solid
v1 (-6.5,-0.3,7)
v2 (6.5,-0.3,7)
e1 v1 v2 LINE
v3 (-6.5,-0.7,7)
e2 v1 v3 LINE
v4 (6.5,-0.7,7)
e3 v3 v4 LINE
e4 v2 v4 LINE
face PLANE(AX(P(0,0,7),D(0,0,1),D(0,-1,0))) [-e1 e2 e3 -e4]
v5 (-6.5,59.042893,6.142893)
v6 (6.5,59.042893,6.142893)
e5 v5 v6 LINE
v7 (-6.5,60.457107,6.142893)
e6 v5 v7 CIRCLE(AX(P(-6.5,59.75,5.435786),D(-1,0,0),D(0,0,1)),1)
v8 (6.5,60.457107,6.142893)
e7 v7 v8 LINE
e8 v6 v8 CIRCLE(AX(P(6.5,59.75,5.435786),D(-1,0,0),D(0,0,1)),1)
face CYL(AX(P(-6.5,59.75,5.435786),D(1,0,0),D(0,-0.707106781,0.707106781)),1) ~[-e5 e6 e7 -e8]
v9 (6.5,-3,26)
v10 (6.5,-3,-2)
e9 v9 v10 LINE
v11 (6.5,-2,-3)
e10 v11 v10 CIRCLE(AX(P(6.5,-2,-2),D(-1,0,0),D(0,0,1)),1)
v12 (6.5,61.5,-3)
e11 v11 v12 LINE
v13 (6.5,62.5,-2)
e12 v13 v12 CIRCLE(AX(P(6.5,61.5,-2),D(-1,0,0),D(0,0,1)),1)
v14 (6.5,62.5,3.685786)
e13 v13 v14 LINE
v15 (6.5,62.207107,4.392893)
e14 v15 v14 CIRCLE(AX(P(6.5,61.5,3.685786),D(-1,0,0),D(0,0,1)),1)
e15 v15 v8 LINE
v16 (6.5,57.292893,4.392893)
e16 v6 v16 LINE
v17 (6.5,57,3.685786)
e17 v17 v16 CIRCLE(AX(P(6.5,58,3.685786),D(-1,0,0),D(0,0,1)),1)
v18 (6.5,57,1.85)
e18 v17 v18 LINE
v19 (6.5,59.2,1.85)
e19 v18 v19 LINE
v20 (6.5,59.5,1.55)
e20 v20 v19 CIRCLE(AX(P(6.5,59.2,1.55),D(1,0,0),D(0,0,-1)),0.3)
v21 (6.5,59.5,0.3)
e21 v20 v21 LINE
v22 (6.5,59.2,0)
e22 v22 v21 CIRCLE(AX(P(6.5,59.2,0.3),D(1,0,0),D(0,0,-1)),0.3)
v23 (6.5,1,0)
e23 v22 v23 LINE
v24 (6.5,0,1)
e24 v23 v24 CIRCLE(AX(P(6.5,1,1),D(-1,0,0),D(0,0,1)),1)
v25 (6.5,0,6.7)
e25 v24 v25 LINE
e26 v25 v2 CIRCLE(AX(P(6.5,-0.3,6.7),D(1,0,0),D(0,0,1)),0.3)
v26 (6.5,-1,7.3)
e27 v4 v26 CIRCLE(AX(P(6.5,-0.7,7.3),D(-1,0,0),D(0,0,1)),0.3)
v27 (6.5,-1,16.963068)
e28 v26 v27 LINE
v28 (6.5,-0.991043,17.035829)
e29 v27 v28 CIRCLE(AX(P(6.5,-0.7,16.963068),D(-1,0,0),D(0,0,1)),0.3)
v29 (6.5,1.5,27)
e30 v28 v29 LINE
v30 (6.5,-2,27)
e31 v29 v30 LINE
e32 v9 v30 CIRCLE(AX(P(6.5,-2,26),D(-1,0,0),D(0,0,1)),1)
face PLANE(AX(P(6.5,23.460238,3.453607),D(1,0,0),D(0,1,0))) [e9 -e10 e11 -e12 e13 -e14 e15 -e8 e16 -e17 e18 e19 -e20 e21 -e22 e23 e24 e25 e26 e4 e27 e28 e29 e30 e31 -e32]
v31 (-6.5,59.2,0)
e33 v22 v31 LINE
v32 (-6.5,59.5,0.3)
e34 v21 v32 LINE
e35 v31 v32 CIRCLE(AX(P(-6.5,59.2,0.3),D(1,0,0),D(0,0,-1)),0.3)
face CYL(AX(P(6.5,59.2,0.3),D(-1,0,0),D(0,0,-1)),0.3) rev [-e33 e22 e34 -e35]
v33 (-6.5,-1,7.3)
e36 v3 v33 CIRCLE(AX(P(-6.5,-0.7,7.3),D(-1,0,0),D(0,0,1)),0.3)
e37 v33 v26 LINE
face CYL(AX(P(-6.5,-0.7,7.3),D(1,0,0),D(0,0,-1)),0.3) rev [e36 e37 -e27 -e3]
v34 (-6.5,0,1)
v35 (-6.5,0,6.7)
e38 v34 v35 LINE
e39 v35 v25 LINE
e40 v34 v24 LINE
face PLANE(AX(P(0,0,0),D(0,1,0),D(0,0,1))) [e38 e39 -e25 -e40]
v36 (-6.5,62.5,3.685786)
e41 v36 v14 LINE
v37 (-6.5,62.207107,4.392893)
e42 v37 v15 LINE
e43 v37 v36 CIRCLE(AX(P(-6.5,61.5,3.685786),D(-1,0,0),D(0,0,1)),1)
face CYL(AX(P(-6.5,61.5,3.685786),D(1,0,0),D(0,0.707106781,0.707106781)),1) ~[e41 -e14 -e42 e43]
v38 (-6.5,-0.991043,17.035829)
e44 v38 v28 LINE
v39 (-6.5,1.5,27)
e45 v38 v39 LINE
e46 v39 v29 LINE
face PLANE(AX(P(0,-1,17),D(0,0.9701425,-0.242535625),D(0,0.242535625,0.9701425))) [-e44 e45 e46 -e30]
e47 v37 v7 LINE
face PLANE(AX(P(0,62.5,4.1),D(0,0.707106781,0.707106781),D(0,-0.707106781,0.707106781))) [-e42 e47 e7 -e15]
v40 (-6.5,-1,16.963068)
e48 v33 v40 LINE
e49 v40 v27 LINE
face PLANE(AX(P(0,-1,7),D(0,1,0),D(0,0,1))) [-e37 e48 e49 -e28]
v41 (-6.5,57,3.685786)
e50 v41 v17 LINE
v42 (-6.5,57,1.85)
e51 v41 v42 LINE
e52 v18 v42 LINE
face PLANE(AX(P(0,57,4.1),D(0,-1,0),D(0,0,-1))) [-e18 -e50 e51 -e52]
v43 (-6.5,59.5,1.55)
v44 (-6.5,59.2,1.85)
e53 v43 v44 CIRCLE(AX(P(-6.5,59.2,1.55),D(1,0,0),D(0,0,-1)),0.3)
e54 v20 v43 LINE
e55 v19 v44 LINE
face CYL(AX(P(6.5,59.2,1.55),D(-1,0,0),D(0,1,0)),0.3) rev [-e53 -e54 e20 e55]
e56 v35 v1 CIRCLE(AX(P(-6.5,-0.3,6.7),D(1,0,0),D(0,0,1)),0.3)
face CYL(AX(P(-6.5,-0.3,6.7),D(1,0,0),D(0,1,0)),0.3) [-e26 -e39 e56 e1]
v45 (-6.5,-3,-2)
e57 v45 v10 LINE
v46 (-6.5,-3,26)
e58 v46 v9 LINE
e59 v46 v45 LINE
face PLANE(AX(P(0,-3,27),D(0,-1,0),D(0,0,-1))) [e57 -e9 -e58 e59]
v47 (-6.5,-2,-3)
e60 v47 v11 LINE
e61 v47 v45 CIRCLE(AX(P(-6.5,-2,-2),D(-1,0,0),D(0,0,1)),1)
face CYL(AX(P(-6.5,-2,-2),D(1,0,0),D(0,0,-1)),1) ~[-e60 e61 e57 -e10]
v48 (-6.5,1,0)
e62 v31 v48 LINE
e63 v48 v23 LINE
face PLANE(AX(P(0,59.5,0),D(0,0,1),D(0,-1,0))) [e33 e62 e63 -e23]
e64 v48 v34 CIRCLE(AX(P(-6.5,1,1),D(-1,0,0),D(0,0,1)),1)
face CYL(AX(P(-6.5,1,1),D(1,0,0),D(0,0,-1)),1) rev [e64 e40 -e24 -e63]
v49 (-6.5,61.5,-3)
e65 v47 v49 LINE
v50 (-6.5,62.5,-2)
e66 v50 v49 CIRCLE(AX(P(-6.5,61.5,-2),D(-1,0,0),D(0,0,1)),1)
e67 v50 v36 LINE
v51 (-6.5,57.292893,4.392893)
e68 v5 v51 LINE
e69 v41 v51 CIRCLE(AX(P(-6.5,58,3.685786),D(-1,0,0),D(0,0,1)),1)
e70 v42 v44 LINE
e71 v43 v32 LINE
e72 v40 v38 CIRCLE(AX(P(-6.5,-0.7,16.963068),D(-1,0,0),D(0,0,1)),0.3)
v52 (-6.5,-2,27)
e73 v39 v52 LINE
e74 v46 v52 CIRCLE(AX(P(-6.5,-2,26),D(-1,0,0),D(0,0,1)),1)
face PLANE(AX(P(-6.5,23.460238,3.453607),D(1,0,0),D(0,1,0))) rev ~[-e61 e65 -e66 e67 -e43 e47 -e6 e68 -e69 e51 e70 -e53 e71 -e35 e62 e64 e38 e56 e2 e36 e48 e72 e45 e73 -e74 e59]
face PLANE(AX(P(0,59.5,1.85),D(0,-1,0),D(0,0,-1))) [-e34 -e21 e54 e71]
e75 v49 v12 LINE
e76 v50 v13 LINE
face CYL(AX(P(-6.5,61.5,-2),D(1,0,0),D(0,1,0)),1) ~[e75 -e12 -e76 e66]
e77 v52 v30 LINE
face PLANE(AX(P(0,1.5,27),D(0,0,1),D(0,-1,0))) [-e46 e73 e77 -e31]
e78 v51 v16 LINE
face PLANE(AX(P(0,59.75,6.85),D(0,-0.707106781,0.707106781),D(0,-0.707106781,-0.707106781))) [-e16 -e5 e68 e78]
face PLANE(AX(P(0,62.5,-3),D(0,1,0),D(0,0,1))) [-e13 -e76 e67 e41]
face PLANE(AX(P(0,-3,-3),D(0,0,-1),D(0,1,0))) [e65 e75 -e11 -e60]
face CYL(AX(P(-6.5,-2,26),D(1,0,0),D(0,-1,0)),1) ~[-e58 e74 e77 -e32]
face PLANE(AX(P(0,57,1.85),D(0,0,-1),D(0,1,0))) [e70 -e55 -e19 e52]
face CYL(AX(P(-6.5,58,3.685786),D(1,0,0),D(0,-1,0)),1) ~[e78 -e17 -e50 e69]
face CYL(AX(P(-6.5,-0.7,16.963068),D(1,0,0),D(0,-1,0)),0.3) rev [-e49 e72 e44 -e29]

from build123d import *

# Parameters (mm, degrees)
F2_DEPTH = 6.5
F3_R     = 1
F4_R     = 0.3


with BuildPart() as f2:
    # F1 (on Right) → F2 (new body, symmetric)
    with BuildSketch(Plane.YZ):
        Polygon((59.5, 0), (0, 0), (0, 7), (-1, 7), (-1, 17), (1.5, 27), (-3, 27), (-3, -3), (0, -3), (59.5, -3), (62.5, -3), (62.5, 4.1), (59.75, 6.85), (57, 4.1), (57, 1.85), (59.5, 1.85), align=None)
    extrude(amount=F2_DEPTH, both=True)

    # F3
    f3_edges = [f2.edges().sort_by_distance(p)[0] for p in [
        (0, 62.5, -3),
        (0, -3, -3),
        (0, -3, 27),
        (0, 62.5, 4.1),
        (0, 59.75, 6.85),
        (0, 57, 4.1),
        (0, 0, 0),
    ]]
    fillet(f3_edges, radius=F3_R)

    # F4
    f4_edges = [f2.edges().sort_by_distance(p)[0] for p in [
        (0, -1, 17),
        (0, 59.5, 0),
        (0, 59.5, 1.85),
        (0, 0, 7),
        (0, -1, 7),
    ]]
    fillet(f4_edges, radius=F4_R)


solid = f2.part
